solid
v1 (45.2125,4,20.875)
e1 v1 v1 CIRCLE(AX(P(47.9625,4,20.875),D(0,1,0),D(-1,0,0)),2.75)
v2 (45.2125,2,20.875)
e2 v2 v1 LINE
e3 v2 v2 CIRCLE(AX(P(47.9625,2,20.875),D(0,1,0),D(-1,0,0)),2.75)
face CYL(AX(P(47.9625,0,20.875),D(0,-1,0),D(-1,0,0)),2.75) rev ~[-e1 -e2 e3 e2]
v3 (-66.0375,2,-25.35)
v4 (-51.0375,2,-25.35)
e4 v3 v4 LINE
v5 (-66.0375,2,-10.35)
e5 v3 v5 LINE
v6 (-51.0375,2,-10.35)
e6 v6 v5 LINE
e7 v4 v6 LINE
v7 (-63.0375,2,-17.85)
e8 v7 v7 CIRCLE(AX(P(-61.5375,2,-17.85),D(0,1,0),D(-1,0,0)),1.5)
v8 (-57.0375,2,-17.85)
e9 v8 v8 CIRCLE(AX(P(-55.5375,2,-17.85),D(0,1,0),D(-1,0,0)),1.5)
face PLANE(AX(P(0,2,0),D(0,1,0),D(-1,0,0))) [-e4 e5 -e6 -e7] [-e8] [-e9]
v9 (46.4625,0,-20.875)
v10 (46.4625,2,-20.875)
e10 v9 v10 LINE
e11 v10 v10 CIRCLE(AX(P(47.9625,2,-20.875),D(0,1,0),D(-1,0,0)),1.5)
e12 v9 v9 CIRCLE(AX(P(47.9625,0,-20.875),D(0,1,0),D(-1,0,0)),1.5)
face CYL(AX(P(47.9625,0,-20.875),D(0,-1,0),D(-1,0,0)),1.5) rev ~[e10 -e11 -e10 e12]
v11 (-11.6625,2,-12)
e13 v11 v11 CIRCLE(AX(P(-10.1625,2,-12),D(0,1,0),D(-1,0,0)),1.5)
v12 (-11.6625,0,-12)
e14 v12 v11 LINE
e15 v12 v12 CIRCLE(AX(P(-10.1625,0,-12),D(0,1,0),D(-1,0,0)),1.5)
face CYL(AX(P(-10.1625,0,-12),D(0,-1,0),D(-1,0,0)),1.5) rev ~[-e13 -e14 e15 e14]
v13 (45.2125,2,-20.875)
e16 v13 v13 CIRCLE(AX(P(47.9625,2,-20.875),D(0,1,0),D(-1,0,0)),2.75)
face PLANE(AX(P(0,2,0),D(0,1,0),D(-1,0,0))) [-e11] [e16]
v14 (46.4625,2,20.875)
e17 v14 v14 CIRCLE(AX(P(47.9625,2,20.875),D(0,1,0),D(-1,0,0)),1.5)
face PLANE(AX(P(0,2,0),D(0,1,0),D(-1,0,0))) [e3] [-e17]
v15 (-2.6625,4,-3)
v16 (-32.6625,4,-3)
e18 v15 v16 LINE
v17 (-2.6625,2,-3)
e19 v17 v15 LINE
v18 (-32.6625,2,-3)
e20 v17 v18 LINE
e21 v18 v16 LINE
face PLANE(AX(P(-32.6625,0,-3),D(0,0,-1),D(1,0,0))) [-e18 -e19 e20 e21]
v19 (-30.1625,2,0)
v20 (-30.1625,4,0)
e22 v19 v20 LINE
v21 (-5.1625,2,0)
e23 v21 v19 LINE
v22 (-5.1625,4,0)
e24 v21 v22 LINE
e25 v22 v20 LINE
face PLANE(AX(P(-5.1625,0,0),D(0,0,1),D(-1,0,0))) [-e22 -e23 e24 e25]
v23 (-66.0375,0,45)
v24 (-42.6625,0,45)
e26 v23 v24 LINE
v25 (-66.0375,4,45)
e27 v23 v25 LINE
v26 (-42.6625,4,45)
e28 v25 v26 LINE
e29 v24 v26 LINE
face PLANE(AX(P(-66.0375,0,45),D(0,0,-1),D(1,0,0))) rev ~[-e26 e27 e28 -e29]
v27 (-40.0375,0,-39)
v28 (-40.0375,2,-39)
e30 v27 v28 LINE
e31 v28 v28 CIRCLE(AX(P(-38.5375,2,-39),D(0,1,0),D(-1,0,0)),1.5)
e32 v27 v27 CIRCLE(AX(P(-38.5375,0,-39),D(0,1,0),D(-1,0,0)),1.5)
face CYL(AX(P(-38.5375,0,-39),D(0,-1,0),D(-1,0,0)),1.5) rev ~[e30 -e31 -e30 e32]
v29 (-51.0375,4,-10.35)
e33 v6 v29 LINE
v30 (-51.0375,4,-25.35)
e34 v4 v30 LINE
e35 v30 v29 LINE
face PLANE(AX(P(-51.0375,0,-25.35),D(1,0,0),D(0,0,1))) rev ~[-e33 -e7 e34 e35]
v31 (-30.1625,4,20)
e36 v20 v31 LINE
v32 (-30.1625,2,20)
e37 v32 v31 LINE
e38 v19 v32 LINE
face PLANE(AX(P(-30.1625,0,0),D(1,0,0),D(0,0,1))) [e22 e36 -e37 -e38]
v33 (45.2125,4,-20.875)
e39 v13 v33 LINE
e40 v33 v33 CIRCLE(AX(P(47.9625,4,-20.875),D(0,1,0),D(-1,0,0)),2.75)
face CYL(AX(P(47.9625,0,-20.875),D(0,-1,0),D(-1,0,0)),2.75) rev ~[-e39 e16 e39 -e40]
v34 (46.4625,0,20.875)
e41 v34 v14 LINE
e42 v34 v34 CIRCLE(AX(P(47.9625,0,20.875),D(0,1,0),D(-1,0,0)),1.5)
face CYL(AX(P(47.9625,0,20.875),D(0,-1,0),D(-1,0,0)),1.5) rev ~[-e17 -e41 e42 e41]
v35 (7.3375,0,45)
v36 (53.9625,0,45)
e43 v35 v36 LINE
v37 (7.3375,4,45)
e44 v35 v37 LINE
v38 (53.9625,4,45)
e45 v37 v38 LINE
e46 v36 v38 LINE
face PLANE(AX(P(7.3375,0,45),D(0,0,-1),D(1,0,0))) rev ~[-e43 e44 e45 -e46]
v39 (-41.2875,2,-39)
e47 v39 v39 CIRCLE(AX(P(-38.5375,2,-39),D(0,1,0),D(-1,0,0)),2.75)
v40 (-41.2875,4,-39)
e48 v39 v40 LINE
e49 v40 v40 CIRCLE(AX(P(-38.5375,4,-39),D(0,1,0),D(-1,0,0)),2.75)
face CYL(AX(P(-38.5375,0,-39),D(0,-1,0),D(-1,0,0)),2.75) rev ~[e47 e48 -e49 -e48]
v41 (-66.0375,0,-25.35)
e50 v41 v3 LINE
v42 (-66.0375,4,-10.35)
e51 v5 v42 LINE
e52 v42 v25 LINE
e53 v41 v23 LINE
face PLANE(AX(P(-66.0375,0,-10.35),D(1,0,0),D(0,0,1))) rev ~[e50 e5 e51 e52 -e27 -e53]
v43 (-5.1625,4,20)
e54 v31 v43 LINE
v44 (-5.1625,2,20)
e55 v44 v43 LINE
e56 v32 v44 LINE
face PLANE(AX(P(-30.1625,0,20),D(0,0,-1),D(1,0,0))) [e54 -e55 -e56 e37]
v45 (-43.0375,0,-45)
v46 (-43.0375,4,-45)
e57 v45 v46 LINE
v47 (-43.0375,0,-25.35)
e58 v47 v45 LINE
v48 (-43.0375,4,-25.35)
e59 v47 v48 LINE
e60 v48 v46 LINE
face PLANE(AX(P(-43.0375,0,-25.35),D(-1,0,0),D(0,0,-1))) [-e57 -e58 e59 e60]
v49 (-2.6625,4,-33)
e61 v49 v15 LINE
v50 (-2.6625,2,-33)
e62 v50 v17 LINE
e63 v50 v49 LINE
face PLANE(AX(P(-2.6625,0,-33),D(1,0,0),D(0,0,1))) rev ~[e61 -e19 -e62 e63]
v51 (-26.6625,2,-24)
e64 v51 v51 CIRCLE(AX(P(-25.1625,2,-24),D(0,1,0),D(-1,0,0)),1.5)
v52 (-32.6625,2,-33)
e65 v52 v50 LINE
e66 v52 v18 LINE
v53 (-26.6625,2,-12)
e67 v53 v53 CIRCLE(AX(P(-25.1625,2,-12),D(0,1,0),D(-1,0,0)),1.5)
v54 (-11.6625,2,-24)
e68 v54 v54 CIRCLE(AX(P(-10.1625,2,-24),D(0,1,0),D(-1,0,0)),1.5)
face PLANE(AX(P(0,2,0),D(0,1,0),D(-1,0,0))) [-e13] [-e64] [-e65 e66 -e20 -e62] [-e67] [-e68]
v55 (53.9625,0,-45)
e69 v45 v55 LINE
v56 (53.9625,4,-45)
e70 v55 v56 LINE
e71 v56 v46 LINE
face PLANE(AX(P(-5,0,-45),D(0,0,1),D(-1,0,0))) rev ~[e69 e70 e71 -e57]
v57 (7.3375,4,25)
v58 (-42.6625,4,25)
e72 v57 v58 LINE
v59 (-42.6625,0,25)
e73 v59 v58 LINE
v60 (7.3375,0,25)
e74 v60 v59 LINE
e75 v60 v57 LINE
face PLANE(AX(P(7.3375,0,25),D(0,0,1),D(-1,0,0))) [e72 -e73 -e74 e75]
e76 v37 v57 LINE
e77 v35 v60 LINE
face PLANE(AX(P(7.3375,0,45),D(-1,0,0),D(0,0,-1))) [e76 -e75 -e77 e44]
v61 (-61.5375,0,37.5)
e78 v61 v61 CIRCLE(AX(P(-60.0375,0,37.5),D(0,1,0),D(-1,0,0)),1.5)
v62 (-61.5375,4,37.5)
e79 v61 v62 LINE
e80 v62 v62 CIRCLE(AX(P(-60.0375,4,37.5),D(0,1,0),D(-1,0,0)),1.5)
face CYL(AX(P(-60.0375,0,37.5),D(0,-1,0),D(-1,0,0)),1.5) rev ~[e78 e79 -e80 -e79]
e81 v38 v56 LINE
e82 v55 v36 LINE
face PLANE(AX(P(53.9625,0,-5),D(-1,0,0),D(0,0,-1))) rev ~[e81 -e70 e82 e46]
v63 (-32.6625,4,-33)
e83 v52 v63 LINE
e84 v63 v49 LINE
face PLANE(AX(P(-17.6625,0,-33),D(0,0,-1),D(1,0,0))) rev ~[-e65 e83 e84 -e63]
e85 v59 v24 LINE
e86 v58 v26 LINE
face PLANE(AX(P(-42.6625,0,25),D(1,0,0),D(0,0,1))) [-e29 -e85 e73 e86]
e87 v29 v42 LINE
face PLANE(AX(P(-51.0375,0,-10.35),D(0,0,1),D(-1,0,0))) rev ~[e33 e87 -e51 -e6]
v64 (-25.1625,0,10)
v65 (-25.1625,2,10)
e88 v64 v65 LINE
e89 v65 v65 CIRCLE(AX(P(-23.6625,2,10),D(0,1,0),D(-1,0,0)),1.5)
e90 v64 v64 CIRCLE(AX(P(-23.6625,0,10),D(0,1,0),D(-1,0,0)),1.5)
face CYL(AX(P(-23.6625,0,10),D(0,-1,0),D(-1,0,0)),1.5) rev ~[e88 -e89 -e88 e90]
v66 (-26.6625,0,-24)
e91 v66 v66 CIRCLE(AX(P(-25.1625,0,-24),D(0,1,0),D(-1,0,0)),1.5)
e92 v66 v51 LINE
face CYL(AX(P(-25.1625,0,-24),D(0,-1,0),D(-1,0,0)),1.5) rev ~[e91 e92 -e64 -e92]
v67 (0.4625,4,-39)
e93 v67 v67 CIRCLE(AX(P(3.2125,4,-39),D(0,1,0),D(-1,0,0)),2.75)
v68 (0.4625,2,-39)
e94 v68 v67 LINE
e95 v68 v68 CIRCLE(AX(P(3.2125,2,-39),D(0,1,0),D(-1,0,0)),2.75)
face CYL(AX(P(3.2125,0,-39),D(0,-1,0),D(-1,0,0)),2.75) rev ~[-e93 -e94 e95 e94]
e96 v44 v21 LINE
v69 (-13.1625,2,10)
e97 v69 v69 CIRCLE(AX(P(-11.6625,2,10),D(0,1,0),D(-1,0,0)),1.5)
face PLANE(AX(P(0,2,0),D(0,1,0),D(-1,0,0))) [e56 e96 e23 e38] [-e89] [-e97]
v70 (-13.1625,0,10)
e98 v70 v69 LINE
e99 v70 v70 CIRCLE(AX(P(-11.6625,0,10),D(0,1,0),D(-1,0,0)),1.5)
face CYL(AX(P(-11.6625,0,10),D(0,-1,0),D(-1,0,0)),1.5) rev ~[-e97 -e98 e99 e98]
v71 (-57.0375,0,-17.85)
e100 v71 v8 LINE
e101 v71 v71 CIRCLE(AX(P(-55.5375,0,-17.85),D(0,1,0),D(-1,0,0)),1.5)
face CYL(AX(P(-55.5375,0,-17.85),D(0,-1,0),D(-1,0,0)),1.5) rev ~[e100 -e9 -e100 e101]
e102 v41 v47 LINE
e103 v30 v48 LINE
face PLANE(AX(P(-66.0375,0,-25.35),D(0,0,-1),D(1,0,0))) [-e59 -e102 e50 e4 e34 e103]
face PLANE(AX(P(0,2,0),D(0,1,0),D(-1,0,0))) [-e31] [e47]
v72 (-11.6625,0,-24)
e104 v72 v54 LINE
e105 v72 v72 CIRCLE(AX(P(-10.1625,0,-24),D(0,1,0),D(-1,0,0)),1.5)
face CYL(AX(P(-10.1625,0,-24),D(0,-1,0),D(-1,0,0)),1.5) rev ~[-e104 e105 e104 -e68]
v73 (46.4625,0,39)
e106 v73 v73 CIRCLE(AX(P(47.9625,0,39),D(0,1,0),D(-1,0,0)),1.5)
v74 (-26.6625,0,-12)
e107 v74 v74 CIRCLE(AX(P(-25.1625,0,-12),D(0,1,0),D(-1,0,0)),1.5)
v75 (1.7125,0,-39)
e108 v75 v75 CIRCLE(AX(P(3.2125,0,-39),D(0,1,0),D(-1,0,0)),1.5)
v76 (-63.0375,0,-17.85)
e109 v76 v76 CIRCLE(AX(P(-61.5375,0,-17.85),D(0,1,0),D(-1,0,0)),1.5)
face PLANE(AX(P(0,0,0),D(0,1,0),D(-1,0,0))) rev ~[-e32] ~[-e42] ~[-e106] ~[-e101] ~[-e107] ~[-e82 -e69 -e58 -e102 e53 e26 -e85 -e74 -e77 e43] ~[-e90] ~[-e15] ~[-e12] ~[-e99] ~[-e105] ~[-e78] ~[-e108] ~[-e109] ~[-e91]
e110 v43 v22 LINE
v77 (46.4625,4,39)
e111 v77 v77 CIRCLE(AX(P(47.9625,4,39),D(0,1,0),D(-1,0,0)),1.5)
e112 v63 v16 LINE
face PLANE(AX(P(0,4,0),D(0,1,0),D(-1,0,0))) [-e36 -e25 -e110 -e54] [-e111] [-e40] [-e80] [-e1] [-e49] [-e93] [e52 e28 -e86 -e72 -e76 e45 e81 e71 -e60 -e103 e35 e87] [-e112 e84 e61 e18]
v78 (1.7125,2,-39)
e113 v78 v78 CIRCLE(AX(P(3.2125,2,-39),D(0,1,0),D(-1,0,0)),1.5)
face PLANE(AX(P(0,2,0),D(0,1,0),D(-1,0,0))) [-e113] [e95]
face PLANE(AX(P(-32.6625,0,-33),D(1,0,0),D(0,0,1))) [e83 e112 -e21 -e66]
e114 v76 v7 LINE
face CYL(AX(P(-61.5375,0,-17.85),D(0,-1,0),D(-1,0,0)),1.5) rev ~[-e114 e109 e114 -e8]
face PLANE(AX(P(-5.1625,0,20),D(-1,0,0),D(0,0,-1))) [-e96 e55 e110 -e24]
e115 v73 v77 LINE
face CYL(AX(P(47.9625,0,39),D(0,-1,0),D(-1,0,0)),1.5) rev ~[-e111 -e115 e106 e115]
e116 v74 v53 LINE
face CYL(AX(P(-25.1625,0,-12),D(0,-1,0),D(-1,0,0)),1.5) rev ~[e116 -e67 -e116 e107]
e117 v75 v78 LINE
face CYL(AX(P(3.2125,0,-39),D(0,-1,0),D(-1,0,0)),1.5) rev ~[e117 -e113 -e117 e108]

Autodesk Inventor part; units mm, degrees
ref_plane "YZ Plane" through (0, 0, 0) normal (1, 0, 0) x (0, 1, 0)
ref_plane "XZ Plane" through (0, 0, 0) normal (0, 1, 0) x (-1, 0, 0)
ref_plane "XY Plane" through (0, 0, 0) normal (0, 0, 1) x (1, 0, 0)
sketch "Sketch1" plane through (0, 0, 0) normal (0, 1, 0) x (-1, 0, 0)
  line L0 (66.0375, 45) -> (-53.9625, 45)
  line L1 (-53.9625, 45) -> (-53.9625, -45)
  line L2 (66.0375, -45) -> (66.0375, 45)
  line L3 (-53.9625, -45) -> (-5, -45)
  line L4 (5, -45) -> (66.0375, -45)
  line L5 (-53.9625, 0) -> (-53.9625, -5)
  line L6 (-53.9625, -5) -> (-53.9625, 5)
  line L7 (30.1625, 20) -> (5.1625, 20)
  line L8 (5.1625, 20) -> (5.1625, 0)
  line L9 (5.1625, 0) -> (30.1625, 0)
  line L10 (30.1625, 0) -> (30.1625, 20)
  line L11 (32.6625, -3) -> (17.6625, -3)
  line L12 (17.6625, -3) -> (17.6625, -33)
  line L13 (17.6625, -33) -> (32.6625, -33)
  line L14 (32.6625, -33) -> (32.6625, -3)
  circle A0 centre (23.6625, 10) radius 1.5
  circle A1 centre (11.6625, 10) radius 1.5
  circle A2 centre (25.1625, -12) radius 1.5
  circle A3 centre (25.1625, -24) radius 1.5
  line L15 (2.6625, -3) -> (17.6625, -3)
  line L16 (17.6625, -3) -> (17.6625, -33)
  line L17 (17.6625, -33) -> (2.6625, -33)
  line L18 (2.6625, -33) -> (2.6625, -3)
  circle A4 centre (10.1625, -12) radius 1.5
  circle A5 centre (10.1625, -24) radius 1.5
  line L19 (42.6625, 45) -> (-7.3375, 45)
  line L20 (-7.3375, 45) -> (-7.3375, 25)
  line L21 (-7.3375, 25) -> (42.6625, 25)
  line L22 (42.6625, 25) -> (42.6625, 45)
  line L23 (5, -45) -> (-5, -45)
  circle A6 centre (-3.2125, -39) radius 1.5
  circle A7 centre (-3.2125, -39) radius 2.75
  circle A8 centre (38.5375, -39) radius 1.5
  circle A9 centre (38.5375, -39) radius 2.75
  circle A10 centre (-47.9625, 39) radius 1.5
  circle A11 centre (60.0375, 37.5) radius 1.5
  line L24 (66.0375, -45) -> (51.0375, -45)
  line L25 (66.0375, -28) -> (66.0375, -45)
  line L26 (66.0375, -25.35) -> (51.0375, -25.35)
  line L27 (51.0375, -25.35) -> (51.0375, -10.35)
  line L28 (51.0375, -10.35) -> (66.0375, -10.35)
  line L29 (66.0375, -10.35) -> (66.0375, -25.35)
  circle A12 centre (61.5375, -17.85) radius 1.5
  circle A13 centre (61.5375, -17.85) radius 2.5
  circle A14 centre (55.5375, -17.85) radius 1.5
  circle A15 centre (55.5375, -17.85) radius 2.5
  circle A16 centre (-47.9625, 20.875) radius 1.5
  circle A17 centre (-47.9625, -20.875) radius 1.5
  line L30 (-39.6875, 0) -> (-58.7375, 0) construction
  circle A18 centre (-47.9625, 20.875) radius 2.75
  circle A19 centre (-47.9625, -20.875) radius 2.75
  line L31 (17.6625, 0) -> (17.6625, -35.175) construction
  line L32 (51.0375, -25.35) -> (43.0375, -25.35)
  line L33 (43.0375, -25.35) -> (43.0375, -45)
  point P0 (0, 0)
  point P1 (5.1625, 10)
  point P2 (25.1625, -33)
  point P3 (8.375, -33)
  point P4 (-7.3375, 45)
  point P5 (46.0375, -45)
  dimension "d0" = 120
  dimension "d1" = 90
  dimension "d21" = 3
  dimension "d22" = 6.5
  dimension "d23" = 3
  dimension "d24" = 6.5
  dimension "d25" = 3
  dimension "d27" = 3
  dimension "d32" = 5
  dimension "d38" = 3
  dimension "d39" = 5.5
  dimension "d40" = 6
  dimension "d41" = 5.5
  dimension "d42" = 3
  dimension "d43" = 6
  dimension "d44" = 6
  dimension "d45" = 3
  dimension "d46" = 6
  dimension "d59" = 19.65
  dimension "d60" = 3
  dimension "d61" = 5
  dimension "d63" = 7.5
  dimension "d68" = 3
  dimension "d69" = 3
  dimension "d70" = 20.875
  dimension "d71" = 20.875
  dimension "d72" = 5.5
  dimension "d73" = 5.5
  dimension "d74" = 0
  dimension "d75" = 0
  dimension "d76" = 7.5
  dimension "d77" = 7.5
  dimension "d78" = 7.5
  dimension "d79" = 7.5
  dimension "d81" = 8
extrude "Extrusion3" add sketch "Sketch1" along normal blind 4 contours L2 L28 L27 L32 L33 L4 L23 L3 L1 L0 L20 L21 L22
extrude "Extrusion4" add sketch "Sketch1" along normal blind 2 contours L2 L26 L27 L28 | L10 L9 L8 L7 | L14 L13 L12 L11 | L12 L17 L18 L15 | A7 | A9 | A13 | A15 | A18 | A19
properties part number "Casis Kiri Atas_3DPrint"
